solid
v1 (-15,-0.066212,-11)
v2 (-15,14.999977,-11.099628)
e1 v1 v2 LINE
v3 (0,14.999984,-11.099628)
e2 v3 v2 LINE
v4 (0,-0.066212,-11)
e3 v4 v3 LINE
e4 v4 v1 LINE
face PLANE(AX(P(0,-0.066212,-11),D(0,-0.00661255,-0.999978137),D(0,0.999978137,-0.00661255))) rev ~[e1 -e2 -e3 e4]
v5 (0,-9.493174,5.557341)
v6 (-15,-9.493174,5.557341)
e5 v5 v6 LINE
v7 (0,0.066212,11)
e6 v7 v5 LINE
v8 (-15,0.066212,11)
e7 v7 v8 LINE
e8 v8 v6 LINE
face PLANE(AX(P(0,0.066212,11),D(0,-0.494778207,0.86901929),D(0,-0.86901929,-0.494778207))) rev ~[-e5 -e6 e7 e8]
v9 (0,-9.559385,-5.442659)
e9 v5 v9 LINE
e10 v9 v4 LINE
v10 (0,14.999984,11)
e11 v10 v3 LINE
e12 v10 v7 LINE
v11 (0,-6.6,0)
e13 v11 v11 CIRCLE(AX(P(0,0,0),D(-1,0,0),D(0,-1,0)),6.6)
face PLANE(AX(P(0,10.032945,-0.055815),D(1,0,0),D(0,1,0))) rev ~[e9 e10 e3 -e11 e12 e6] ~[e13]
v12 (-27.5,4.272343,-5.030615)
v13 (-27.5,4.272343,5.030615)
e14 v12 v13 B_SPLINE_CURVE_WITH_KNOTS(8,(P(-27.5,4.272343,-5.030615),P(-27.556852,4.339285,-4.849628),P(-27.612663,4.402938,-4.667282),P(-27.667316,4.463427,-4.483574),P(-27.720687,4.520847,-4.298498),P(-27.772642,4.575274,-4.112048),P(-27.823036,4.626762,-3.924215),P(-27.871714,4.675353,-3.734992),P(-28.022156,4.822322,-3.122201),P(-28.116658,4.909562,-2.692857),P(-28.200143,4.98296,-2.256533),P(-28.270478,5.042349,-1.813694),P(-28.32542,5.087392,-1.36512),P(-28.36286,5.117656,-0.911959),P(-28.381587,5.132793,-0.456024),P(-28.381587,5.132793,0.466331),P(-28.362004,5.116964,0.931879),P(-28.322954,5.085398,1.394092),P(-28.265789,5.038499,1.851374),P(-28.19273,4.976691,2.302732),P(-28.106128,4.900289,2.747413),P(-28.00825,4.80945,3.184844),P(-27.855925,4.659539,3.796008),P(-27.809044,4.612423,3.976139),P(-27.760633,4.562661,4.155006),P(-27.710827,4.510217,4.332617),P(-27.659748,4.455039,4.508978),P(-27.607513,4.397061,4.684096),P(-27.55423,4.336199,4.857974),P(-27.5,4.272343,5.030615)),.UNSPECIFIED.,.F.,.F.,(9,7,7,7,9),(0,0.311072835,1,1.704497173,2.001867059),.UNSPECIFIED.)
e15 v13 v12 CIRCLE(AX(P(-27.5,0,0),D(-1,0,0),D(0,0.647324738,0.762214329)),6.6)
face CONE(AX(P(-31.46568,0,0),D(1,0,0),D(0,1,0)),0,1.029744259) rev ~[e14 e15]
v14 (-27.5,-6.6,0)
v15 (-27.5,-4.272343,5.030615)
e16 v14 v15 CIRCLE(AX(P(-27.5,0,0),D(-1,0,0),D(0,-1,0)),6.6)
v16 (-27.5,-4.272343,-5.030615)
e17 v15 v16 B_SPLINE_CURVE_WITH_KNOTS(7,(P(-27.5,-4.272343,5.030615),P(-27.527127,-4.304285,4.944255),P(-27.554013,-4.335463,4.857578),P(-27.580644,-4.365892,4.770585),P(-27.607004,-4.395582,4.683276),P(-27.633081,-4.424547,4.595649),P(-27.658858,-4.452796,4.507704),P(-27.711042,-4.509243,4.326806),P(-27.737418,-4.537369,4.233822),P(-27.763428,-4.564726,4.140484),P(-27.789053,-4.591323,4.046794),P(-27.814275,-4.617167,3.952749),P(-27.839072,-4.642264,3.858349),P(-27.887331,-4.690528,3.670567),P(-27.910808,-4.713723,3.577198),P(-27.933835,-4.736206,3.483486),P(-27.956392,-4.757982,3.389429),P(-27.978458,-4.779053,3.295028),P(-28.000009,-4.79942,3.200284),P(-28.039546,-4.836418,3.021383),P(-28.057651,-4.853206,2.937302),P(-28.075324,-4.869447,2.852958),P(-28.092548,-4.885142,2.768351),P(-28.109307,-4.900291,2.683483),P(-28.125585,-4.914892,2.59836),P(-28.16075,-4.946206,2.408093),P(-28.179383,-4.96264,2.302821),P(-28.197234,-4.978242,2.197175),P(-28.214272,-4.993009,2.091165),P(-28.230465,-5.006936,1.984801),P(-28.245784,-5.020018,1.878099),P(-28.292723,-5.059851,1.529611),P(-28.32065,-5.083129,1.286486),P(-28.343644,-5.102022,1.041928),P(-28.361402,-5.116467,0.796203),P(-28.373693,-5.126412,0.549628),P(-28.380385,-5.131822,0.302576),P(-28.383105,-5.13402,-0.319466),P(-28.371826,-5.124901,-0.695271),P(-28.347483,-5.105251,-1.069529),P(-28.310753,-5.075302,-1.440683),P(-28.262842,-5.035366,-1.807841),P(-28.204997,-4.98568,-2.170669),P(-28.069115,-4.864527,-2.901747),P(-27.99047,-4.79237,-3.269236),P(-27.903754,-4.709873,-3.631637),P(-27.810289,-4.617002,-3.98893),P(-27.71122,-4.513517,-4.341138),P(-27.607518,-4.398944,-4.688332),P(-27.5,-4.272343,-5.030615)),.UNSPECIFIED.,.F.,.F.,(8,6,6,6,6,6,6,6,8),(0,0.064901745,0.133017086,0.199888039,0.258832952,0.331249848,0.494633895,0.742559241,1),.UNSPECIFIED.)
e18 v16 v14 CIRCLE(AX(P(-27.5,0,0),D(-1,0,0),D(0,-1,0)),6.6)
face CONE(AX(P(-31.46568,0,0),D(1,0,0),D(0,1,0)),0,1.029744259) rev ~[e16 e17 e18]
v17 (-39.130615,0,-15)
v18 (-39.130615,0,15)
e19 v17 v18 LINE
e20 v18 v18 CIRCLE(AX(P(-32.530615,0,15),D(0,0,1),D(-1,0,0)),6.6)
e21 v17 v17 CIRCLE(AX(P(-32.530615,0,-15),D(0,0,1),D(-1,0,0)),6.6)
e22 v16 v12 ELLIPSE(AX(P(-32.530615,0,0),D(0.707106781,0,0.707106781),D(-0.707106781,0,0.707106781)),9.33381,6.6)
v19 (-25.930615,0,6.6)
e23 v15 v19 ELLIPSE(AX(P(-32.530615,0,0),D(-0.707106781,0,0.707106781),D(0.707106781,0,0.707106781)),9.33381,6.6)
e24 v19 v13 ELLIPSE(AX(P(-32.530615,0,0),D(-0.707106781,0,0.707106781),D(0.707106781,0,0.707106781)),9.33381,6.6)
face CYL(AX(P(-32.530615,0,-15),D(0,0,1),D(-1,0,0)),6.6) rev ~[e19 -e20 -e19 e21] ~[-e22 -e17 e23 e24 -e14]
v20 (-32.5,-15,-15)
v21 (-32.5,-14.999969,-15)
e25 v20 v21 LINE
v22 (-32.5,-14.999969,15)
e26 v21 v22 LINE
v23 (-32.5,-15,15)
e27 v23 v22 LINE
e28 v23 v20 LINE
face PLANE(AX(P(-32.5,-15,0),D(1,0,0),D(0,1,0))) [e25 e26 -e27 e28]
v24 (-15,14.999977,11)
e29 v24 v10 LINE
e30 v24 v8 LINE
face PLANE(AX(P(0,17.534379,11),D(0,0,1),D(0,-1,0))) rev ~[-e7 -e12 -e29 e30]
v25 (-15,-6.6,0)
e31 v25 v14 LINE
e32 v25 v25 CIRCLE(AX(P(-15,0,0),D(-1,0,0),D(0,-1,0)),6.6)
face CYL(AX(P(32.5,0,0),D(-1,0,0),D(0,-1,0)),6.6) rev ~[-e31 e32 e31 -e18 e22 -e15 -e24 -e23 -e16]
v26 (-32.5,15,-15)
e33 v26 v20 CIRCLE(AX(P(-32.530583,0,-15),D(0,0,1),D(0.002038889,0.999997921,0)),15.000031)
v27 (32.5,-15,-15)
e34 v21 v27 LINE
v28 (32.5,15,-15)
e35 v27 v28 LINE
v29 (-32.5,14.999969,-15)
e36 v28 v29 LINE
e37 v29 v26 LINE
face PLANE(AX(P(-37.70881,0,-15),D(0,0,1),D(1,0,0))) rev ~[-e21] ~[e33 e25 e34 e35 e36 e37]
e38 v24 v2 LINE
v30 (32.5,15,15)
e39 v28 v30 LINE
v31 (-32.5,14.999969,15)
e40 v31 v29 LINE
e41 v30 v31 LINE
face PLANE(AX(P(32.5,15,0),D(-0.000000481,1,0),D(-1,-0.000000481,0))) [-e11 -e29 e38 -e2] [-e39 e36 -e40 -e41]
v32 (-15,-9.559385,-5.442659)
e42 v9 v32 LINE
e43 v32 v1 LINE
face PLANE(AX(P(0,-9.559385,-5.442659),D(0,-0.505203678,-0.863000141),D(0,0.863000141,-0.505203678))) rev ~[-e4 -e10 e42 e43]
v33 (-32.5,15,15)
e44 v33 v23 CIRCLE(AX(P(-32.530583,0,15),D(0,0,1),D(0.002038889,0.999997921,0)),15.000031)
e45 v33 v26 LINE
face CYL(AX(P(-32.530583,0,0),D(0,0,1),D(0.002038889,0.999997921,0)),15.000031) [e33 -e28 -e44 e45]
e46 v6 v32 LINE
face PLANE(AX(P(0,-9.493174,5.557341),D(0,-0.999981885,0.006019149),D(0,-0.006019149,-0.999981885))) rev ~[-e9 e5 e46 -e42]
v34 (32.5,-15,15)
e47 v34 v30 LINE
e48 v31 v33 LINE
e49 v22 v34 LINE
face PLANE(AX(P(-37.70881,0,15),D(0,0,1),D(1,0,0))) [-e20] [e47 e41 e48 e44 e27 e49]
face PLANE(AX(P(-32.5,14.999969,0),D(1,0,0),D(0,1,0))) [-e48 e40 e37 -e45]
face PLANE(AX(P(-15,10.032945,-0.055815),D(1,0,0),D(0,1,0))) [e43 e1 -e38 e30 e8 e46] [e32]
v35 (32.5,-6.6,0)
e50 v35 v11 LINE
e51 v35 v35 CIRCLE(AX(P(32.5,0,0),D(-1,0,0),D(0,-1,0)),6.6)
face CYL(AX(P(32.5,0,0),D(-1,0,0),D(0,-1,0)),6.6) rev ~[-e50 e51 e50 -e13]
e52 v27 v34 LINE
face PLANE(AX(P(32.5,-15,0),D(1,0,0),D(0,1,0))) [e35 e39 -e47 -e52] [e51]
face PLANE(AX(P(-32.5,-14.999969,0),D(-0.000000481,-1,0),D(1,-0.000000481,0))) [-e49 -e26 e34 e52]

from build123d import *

# Parameters (mm, degrees)
F1_DEPTH       = 15
F3_DEPTH       = 15
F5_D           = 13.2
F5_DEPTH       = 60
F5_CBORE_D     = 19.25
F5_CBORE_DEPTH = 0
F5_TIP         = 3.9656800856
F7_D           = 13.2
F7_DEPTH       = 60
F7_CBORE_D     = 19.25
F7_CBORE_DEPTH = 0
F7_TIP         = 3.9656800856


# Not quite as in the source:
# - ends of sketch curves that miss each other by under 0.0002 mm in the source are joined


with BuildPart() as f1:
    # F0 (on Top) → F1 (new body, symmetric)
    with BuildSketch(Plane.XY):
        with BuildLine():
            Line((-32.5, -15), (-32.5, 15))
            ThreePointArc((-32.5, 15), (-47.5306145724, 0), (-32.5, -15))
        make_face()
        with BuildLine():
            ThreePointArc((-32.5000000638, -14.9999687584), (-21.9131945085, -10.595772326), (-17.5306145724, 0))
            ThreePointArc((-17.5306145724, 0), (-21.9131945085, 10.595772326), (-32.5000000638, 14.9999687584))
            Line((-32.5000000638, 14.9999687584), (-32.5000000638, -14.9999687584))
        make_face()
        with BuildLine():
            ThreePointArc((-32.5000000638, 14.9999687584), (-21.9131945085, 10.595772326), (-17.5306145724, 0))
            ThreePointArc((-17.5306145724, 0), (-21.9131945085, -10.595772326), (-32.5000000638, -14.9999687584))
            Line((-32.5000000638, -14.9999687584), (32.5, -15))
            Line((32.5, -15), (32.5, 15))
            Line((32.5, 15), (-32.5000000638, 14.9999687584))
        make_face()
    extrude(amount=F1_DEPTH, both=True)

    # F2 (on Right) → F3 (cut)
    with BuildSketch(Plane.YZ):
        Polygon((9.5593853593, 5.4426588685), (9.4931735239, -5.5573411315), (-0.0662118354, -11), (17.534378916, -11.1163873225), (17.534378916, 11), (0.0662118354, 11), align=None)
        Polygon((-0.0662118354, -11), (9.4931735239, -5.5573411315), (9.5593853593, 5.4426588685), (0.0662118354, 11), (-9.4931735239, 5.5573411315), (-9.5593853593, -5.4426588685), align=None)
    extrude(amount=-F3_DEPTH, mode=Mode.SUBTRACT)

    # F5
    with Locations(Plane(origin=(0, 0, -15), x_dir=(1, 0, 0), z_dir=(0, 0, -1))):
        with Locations((-32.5306145724, 0)):
            CounterBoreHole(F5_D / 2, F5_CBORE_D / 2, F5_CBORE_DEPTH, depth=F5_DEPTH)
            with Locations((0, 0, -(F5_DEPTH + F5_TIP / 2))):  # 118° drill point
                Cone(0, F5_D / 2, F5_TIP, mode=Mode.SUBTRACT)

    # F7
    with Locations(Plane.YZ.offset(32.5)):
        with Locations((0, 0)):
            CounterBoreHole(F7_D / 2, F7_CBORE_D / 2, F7_CBORE_DEPTH, depth=F7_DEPTH)
            with Locations((0, 0, -(F7_DEPTH + F7_TIP / 2))):  # 118° drill point
                Cone(0, F7_D / 2, F7_TIP, mode=Mode.SUBTRACT)


solid = f1.part
